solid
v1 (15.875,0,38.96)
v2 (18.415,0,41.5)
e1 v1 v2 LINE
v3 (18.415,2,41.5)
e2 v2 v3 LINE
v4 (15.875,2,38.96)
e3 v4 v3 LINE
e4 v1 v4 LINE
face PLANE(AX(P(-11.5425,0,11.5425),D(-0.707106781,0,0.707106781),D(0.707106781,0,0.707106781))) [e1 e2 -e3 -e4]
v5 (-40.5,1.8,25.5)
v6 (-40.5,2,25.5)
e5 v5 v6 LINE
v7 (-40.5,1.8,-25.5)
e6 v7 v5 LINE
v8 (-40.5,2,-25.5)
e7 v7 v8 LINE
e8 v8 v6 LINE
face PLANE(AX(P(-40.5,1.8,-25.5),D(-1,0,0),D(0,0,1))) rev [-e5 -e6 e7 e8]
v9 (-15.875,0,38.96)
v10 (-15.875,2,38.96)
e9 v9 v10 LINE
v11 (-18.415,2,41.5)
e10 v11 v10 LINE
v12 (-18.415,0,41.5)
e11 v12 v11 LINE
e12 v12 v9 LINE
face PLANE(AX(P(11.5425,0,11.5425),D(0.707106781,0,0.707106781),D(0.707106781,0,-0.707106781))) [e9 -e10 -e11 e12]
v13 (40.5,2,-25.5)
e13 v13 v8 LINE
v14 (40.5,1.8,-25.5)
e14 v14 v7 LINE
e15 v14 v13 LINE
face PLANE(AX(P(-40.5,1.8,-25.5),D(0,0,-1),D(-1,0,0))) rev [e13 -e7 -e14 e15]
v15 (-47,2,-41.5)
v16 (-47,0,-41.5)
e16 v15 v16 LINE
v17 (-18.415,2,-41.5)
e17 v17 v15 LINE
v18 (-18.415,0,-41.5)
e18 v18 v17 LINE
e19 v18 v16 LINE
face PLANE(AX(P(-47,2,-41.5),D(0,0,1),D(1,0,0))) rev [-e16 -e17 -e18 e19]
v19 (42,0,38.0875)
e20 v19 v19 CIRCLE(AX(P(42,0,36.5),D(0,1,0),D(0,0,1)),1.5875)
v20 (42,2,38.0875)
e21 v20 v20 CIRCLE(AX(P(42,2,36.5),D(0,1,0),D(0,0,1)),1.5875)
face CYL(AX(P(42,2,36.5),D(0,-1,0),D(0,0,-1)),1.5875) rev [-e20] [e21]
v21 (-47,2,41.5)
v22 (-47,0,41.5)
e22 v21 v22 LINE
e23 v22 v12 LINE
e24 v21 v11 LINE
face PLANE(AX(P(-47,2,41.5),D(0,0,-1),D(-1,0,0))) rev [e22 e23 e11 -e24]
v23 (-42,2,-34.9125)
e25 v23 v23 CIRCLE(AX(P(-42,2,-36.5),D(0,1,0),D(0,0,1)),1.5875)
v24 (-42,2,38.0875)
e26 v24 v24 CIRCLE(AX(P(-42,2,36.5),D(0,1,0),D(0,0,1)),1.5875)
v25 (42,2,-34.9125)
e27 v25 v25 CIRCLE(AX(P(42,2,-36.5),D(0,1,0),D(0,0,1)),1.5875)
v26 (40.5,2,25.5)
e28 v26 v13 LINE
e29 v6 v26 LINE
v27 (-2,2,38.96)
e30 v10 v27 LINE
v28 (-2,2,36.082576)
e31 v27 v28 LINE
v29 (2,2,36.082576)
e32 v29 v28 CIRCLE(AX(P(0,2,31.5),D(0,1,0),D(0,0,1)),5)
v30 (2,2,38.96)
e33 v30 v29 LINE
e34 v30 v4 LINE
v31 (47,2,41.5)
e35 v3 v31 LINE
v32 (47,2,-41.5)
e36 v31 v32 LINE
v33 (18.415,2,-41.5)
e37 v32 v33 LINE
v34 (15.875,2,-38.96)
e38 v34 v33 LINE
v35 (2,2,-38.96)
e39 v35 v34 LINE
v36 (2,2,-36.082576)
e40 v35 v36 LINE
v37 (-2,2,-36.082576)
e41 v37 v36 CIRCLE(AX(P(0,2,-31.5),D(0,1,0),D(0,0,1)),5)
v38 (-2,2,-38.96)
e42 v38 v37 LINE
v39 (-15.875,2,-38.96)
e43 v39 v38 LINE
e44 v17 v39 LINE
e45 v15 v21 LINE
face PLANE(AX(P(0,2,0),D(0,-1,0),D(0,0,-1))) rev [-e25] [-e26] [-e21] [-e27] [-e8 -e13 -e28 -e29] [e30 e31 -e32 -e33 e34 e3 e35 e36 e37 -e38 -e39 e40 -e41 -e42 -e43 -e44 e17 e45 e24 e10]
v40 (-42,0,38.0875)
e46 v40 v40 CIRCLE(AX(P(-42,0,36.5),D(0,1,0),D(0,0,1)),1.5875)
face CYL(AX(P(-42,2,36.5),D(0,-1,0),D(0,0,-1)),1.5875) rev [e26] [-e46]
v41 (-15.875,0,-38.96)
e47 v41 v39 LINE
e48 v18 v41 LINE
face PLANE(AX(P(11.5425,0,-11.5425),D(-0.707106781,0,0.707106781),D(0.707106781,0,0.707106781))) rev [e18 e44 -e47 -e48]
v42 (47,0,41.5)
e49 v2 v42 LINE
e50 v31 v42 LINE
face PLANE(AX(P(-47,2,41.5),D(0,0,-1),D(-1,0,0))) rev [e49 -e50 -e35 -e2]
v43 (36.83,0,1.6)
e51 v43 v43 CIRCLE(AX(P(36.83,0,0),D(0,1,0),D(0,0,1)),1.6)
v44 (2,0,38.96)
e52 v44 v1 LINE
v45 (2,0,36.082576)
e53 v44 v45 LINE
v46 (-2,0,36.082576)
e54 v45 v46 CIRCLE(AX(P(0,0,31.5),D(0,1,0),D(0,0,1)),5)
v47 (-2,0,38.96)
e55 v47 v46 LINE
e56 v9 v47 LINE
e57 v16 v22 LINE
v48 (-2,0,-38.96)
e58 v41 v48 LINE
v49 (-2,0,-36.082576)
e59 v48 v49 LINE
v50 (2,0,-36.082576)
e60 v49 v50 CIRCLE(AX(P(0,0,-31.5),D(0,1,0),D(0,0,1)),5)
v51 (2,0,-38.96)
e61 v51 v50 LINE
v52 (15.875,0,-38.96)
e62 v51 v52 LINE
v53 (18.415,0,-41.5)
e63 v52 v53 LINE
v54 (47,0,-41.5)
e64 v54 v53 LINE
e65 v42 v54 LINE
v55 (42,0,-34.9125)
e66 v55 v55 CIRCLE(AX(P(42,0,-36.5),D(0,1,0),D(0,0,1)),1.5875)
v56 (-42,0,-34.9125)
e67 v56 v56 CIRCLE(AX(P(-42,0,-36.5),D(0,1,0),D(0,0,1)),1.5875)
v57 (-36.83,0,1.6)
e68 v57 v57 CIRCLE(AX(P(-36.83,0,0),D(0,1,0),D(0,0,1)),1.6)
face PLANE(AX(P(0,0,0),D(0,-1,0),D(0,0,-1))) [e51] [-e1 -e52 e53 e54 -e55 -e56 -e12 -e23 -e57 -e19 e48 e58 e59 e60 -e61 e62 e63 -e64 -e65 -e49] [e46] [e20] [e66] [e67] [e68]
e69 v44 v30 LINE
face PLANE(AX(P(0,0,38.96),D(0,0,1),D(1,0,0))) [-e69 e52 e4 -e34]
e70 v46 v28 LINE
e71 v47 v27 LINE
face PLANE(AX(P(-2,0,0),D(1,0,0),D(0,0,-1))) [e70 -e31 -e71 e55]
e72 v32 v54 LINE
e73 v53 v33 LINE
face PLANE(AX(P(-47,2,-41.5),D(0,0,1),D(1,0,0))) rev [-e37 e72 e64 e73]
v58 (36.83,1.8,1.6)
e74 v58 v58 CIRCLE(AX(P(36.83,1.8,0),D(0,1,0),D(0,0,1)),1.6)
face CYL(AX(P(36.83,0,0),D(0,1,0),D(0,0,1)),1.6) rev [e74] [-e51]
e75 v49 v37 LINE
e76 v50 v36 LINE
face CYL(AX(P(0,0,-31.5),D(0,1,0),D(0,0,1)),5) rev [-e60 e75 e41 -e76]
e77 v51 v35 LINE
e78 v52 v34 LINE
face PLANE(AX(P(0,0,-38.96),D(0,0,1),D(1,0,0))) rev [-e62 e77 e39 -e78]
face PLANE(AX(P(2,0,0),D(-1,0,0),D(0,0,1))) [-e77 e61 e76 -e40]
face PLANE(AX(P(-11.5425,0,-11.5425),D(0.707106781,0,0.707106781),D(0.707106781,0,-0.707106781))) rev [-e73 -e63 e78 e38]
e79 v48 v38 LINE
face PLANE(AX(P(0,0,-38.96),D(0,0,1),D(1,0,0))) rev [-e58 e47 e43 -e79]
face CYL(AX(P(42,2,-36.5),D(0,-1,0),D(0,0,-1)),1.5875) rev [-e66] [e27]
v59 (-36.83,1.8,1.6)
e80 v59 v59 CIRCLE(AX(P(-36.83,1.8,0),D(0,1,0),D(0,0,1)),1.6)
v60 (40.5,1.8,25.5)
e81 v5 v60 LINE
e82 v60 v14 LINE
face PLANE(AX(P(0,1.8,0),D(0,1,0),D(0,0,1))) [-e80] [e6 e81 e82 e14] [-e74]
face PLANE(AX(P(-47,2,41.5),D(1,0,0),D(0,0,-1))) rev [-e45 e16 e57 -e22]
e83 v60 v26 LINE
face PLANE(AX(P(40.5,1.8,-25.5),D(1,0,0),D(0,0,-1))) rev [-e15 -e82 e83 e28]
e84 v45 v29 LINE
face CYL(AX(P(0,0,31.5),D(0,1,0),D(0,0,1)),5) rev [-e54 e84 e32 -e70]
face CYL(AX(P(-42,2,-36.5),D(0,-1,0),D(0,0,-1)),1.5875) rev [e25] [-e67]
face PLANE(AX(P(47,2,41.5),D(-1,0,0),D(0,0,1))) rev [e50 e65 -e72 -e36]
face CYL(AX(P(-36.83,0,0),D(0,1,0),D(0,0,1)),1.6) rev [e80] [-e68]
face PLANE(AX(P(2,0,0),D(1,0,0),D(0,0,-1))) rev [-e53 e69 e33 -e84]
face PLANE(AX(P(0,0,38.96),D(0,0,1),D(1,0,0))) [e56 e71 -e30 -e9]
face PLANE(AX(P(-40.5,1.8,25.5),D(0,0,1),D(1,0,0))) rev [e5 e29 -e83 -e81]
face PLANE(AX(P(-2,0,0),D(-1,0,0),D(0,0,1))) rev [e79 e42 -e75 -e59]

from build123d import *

# Parameters (mm, degrees)
SKETCH1_W           = 94
SKETCH1_H           = 83
SKETCH1_R           = 1.5875
BOSS_EXTRUDE1_DEPTH = 2
SKETCH2_W           = 81
SKETCH2_H           = 51
CUT_EXTRUDE1_DEPTH  = 0.2
SKETCH3_R           = 1.6
CUT_EXTRUDE2_DEPTH  = 63.731570999


with BuildPart() as part:
    # Sketch1 → Boss-Extrude1 (new body)
    with BuildSketch(Plane(origin=(0, 0, 0), x_dir=(1, 0, 0), z_dir=(0, 1, 0))):
        Rectangle(SKETCH1_W, SKETCH1_H)
        with Locations((-42, 36.5)):
            Circle(SKETCH1_R, mode=Mode.SUBTRACT)
        with Locations((42, 36.5)):
            Circle(SKETCH1_R, mode=Mode.SUBTRACT)
        with Locations((42, -36.5)):
            Circle(SKETCH1_R, mode=Mode.SUBTRACT)
        with Locations((-42, -36.5)):
            Circle(SKETCH1_R, mode=Mode.SUBTRACT)
    extrude(amount=BOSS_EXTRUDE1_DEPTH)

    # Sketch2 → Cut-Extrude1 (cut)
    with BuildSketch(Plane(origin=(0, 2, 0), x_dir=(1, 0, 0), z_dir=(0, 1, 0))):
        Rectangle(SKETCH2_W, SKETCH2_H)
    extrude(amount=-CUT_EXTRUDE1_DEPTH, mode=Mode.SUBTRACT)

    # Sketch3 → Cut-Extrude2 (cut, through all)
    with BuildSketch(Plane(origin=(0, 2, 0), x_dir=(1, 0, 0), z_dir=(0, 1, 0))):
        with BuildLine():
            Line((18.415, 41.5), (-18.415, 41.5))
            Line((-18.415, 41.5), (-15.875, 38.96))
            Line((-15.875, 38.96), (-2, 38.96))
            Line((-2, 38.96), (-2, 36.082575695))
            ThreePointArc((-2, 36.082575695), (0, 26.5), (2, 36.082575695))
            Line((2, 36.082575695), (2, 38.96))
            Line((2, 38.96), (15.875, 38.96))
            Line((15.875, 38.96), (18.415, 41.5))
        make_face()
        with BuildLine():
            Line((-18.415, -41.5), (18.415, -41.5))
            Line((18.415, -41.5), (15.875, -38.96))
            Line((15.875, -38.96), (2, -38.96))
            Line((2, -38.96), (2, -36.082575695))
            ThreePointArc((2, -36.082575695), (0, -26.5), (-2, -36.082575695))
            Line((-2, -36.082575695), (-2, -38.96))
            Line((-2, -38.96), (-15.875, -38.96))
            Line((-15.875, -38.96), (-18.415, -41.5))
        make_face()
        with Locations((-36.83, 0)):
            Circle(SKETCH3_R)
        with Locations((36.83, 0)):
            Circle(SKETCH3_R)
    extrude(amount=-CUT_EXTRUDE2_DEPTH, mode=Mode.SUBTRACT)


solid = part.part
